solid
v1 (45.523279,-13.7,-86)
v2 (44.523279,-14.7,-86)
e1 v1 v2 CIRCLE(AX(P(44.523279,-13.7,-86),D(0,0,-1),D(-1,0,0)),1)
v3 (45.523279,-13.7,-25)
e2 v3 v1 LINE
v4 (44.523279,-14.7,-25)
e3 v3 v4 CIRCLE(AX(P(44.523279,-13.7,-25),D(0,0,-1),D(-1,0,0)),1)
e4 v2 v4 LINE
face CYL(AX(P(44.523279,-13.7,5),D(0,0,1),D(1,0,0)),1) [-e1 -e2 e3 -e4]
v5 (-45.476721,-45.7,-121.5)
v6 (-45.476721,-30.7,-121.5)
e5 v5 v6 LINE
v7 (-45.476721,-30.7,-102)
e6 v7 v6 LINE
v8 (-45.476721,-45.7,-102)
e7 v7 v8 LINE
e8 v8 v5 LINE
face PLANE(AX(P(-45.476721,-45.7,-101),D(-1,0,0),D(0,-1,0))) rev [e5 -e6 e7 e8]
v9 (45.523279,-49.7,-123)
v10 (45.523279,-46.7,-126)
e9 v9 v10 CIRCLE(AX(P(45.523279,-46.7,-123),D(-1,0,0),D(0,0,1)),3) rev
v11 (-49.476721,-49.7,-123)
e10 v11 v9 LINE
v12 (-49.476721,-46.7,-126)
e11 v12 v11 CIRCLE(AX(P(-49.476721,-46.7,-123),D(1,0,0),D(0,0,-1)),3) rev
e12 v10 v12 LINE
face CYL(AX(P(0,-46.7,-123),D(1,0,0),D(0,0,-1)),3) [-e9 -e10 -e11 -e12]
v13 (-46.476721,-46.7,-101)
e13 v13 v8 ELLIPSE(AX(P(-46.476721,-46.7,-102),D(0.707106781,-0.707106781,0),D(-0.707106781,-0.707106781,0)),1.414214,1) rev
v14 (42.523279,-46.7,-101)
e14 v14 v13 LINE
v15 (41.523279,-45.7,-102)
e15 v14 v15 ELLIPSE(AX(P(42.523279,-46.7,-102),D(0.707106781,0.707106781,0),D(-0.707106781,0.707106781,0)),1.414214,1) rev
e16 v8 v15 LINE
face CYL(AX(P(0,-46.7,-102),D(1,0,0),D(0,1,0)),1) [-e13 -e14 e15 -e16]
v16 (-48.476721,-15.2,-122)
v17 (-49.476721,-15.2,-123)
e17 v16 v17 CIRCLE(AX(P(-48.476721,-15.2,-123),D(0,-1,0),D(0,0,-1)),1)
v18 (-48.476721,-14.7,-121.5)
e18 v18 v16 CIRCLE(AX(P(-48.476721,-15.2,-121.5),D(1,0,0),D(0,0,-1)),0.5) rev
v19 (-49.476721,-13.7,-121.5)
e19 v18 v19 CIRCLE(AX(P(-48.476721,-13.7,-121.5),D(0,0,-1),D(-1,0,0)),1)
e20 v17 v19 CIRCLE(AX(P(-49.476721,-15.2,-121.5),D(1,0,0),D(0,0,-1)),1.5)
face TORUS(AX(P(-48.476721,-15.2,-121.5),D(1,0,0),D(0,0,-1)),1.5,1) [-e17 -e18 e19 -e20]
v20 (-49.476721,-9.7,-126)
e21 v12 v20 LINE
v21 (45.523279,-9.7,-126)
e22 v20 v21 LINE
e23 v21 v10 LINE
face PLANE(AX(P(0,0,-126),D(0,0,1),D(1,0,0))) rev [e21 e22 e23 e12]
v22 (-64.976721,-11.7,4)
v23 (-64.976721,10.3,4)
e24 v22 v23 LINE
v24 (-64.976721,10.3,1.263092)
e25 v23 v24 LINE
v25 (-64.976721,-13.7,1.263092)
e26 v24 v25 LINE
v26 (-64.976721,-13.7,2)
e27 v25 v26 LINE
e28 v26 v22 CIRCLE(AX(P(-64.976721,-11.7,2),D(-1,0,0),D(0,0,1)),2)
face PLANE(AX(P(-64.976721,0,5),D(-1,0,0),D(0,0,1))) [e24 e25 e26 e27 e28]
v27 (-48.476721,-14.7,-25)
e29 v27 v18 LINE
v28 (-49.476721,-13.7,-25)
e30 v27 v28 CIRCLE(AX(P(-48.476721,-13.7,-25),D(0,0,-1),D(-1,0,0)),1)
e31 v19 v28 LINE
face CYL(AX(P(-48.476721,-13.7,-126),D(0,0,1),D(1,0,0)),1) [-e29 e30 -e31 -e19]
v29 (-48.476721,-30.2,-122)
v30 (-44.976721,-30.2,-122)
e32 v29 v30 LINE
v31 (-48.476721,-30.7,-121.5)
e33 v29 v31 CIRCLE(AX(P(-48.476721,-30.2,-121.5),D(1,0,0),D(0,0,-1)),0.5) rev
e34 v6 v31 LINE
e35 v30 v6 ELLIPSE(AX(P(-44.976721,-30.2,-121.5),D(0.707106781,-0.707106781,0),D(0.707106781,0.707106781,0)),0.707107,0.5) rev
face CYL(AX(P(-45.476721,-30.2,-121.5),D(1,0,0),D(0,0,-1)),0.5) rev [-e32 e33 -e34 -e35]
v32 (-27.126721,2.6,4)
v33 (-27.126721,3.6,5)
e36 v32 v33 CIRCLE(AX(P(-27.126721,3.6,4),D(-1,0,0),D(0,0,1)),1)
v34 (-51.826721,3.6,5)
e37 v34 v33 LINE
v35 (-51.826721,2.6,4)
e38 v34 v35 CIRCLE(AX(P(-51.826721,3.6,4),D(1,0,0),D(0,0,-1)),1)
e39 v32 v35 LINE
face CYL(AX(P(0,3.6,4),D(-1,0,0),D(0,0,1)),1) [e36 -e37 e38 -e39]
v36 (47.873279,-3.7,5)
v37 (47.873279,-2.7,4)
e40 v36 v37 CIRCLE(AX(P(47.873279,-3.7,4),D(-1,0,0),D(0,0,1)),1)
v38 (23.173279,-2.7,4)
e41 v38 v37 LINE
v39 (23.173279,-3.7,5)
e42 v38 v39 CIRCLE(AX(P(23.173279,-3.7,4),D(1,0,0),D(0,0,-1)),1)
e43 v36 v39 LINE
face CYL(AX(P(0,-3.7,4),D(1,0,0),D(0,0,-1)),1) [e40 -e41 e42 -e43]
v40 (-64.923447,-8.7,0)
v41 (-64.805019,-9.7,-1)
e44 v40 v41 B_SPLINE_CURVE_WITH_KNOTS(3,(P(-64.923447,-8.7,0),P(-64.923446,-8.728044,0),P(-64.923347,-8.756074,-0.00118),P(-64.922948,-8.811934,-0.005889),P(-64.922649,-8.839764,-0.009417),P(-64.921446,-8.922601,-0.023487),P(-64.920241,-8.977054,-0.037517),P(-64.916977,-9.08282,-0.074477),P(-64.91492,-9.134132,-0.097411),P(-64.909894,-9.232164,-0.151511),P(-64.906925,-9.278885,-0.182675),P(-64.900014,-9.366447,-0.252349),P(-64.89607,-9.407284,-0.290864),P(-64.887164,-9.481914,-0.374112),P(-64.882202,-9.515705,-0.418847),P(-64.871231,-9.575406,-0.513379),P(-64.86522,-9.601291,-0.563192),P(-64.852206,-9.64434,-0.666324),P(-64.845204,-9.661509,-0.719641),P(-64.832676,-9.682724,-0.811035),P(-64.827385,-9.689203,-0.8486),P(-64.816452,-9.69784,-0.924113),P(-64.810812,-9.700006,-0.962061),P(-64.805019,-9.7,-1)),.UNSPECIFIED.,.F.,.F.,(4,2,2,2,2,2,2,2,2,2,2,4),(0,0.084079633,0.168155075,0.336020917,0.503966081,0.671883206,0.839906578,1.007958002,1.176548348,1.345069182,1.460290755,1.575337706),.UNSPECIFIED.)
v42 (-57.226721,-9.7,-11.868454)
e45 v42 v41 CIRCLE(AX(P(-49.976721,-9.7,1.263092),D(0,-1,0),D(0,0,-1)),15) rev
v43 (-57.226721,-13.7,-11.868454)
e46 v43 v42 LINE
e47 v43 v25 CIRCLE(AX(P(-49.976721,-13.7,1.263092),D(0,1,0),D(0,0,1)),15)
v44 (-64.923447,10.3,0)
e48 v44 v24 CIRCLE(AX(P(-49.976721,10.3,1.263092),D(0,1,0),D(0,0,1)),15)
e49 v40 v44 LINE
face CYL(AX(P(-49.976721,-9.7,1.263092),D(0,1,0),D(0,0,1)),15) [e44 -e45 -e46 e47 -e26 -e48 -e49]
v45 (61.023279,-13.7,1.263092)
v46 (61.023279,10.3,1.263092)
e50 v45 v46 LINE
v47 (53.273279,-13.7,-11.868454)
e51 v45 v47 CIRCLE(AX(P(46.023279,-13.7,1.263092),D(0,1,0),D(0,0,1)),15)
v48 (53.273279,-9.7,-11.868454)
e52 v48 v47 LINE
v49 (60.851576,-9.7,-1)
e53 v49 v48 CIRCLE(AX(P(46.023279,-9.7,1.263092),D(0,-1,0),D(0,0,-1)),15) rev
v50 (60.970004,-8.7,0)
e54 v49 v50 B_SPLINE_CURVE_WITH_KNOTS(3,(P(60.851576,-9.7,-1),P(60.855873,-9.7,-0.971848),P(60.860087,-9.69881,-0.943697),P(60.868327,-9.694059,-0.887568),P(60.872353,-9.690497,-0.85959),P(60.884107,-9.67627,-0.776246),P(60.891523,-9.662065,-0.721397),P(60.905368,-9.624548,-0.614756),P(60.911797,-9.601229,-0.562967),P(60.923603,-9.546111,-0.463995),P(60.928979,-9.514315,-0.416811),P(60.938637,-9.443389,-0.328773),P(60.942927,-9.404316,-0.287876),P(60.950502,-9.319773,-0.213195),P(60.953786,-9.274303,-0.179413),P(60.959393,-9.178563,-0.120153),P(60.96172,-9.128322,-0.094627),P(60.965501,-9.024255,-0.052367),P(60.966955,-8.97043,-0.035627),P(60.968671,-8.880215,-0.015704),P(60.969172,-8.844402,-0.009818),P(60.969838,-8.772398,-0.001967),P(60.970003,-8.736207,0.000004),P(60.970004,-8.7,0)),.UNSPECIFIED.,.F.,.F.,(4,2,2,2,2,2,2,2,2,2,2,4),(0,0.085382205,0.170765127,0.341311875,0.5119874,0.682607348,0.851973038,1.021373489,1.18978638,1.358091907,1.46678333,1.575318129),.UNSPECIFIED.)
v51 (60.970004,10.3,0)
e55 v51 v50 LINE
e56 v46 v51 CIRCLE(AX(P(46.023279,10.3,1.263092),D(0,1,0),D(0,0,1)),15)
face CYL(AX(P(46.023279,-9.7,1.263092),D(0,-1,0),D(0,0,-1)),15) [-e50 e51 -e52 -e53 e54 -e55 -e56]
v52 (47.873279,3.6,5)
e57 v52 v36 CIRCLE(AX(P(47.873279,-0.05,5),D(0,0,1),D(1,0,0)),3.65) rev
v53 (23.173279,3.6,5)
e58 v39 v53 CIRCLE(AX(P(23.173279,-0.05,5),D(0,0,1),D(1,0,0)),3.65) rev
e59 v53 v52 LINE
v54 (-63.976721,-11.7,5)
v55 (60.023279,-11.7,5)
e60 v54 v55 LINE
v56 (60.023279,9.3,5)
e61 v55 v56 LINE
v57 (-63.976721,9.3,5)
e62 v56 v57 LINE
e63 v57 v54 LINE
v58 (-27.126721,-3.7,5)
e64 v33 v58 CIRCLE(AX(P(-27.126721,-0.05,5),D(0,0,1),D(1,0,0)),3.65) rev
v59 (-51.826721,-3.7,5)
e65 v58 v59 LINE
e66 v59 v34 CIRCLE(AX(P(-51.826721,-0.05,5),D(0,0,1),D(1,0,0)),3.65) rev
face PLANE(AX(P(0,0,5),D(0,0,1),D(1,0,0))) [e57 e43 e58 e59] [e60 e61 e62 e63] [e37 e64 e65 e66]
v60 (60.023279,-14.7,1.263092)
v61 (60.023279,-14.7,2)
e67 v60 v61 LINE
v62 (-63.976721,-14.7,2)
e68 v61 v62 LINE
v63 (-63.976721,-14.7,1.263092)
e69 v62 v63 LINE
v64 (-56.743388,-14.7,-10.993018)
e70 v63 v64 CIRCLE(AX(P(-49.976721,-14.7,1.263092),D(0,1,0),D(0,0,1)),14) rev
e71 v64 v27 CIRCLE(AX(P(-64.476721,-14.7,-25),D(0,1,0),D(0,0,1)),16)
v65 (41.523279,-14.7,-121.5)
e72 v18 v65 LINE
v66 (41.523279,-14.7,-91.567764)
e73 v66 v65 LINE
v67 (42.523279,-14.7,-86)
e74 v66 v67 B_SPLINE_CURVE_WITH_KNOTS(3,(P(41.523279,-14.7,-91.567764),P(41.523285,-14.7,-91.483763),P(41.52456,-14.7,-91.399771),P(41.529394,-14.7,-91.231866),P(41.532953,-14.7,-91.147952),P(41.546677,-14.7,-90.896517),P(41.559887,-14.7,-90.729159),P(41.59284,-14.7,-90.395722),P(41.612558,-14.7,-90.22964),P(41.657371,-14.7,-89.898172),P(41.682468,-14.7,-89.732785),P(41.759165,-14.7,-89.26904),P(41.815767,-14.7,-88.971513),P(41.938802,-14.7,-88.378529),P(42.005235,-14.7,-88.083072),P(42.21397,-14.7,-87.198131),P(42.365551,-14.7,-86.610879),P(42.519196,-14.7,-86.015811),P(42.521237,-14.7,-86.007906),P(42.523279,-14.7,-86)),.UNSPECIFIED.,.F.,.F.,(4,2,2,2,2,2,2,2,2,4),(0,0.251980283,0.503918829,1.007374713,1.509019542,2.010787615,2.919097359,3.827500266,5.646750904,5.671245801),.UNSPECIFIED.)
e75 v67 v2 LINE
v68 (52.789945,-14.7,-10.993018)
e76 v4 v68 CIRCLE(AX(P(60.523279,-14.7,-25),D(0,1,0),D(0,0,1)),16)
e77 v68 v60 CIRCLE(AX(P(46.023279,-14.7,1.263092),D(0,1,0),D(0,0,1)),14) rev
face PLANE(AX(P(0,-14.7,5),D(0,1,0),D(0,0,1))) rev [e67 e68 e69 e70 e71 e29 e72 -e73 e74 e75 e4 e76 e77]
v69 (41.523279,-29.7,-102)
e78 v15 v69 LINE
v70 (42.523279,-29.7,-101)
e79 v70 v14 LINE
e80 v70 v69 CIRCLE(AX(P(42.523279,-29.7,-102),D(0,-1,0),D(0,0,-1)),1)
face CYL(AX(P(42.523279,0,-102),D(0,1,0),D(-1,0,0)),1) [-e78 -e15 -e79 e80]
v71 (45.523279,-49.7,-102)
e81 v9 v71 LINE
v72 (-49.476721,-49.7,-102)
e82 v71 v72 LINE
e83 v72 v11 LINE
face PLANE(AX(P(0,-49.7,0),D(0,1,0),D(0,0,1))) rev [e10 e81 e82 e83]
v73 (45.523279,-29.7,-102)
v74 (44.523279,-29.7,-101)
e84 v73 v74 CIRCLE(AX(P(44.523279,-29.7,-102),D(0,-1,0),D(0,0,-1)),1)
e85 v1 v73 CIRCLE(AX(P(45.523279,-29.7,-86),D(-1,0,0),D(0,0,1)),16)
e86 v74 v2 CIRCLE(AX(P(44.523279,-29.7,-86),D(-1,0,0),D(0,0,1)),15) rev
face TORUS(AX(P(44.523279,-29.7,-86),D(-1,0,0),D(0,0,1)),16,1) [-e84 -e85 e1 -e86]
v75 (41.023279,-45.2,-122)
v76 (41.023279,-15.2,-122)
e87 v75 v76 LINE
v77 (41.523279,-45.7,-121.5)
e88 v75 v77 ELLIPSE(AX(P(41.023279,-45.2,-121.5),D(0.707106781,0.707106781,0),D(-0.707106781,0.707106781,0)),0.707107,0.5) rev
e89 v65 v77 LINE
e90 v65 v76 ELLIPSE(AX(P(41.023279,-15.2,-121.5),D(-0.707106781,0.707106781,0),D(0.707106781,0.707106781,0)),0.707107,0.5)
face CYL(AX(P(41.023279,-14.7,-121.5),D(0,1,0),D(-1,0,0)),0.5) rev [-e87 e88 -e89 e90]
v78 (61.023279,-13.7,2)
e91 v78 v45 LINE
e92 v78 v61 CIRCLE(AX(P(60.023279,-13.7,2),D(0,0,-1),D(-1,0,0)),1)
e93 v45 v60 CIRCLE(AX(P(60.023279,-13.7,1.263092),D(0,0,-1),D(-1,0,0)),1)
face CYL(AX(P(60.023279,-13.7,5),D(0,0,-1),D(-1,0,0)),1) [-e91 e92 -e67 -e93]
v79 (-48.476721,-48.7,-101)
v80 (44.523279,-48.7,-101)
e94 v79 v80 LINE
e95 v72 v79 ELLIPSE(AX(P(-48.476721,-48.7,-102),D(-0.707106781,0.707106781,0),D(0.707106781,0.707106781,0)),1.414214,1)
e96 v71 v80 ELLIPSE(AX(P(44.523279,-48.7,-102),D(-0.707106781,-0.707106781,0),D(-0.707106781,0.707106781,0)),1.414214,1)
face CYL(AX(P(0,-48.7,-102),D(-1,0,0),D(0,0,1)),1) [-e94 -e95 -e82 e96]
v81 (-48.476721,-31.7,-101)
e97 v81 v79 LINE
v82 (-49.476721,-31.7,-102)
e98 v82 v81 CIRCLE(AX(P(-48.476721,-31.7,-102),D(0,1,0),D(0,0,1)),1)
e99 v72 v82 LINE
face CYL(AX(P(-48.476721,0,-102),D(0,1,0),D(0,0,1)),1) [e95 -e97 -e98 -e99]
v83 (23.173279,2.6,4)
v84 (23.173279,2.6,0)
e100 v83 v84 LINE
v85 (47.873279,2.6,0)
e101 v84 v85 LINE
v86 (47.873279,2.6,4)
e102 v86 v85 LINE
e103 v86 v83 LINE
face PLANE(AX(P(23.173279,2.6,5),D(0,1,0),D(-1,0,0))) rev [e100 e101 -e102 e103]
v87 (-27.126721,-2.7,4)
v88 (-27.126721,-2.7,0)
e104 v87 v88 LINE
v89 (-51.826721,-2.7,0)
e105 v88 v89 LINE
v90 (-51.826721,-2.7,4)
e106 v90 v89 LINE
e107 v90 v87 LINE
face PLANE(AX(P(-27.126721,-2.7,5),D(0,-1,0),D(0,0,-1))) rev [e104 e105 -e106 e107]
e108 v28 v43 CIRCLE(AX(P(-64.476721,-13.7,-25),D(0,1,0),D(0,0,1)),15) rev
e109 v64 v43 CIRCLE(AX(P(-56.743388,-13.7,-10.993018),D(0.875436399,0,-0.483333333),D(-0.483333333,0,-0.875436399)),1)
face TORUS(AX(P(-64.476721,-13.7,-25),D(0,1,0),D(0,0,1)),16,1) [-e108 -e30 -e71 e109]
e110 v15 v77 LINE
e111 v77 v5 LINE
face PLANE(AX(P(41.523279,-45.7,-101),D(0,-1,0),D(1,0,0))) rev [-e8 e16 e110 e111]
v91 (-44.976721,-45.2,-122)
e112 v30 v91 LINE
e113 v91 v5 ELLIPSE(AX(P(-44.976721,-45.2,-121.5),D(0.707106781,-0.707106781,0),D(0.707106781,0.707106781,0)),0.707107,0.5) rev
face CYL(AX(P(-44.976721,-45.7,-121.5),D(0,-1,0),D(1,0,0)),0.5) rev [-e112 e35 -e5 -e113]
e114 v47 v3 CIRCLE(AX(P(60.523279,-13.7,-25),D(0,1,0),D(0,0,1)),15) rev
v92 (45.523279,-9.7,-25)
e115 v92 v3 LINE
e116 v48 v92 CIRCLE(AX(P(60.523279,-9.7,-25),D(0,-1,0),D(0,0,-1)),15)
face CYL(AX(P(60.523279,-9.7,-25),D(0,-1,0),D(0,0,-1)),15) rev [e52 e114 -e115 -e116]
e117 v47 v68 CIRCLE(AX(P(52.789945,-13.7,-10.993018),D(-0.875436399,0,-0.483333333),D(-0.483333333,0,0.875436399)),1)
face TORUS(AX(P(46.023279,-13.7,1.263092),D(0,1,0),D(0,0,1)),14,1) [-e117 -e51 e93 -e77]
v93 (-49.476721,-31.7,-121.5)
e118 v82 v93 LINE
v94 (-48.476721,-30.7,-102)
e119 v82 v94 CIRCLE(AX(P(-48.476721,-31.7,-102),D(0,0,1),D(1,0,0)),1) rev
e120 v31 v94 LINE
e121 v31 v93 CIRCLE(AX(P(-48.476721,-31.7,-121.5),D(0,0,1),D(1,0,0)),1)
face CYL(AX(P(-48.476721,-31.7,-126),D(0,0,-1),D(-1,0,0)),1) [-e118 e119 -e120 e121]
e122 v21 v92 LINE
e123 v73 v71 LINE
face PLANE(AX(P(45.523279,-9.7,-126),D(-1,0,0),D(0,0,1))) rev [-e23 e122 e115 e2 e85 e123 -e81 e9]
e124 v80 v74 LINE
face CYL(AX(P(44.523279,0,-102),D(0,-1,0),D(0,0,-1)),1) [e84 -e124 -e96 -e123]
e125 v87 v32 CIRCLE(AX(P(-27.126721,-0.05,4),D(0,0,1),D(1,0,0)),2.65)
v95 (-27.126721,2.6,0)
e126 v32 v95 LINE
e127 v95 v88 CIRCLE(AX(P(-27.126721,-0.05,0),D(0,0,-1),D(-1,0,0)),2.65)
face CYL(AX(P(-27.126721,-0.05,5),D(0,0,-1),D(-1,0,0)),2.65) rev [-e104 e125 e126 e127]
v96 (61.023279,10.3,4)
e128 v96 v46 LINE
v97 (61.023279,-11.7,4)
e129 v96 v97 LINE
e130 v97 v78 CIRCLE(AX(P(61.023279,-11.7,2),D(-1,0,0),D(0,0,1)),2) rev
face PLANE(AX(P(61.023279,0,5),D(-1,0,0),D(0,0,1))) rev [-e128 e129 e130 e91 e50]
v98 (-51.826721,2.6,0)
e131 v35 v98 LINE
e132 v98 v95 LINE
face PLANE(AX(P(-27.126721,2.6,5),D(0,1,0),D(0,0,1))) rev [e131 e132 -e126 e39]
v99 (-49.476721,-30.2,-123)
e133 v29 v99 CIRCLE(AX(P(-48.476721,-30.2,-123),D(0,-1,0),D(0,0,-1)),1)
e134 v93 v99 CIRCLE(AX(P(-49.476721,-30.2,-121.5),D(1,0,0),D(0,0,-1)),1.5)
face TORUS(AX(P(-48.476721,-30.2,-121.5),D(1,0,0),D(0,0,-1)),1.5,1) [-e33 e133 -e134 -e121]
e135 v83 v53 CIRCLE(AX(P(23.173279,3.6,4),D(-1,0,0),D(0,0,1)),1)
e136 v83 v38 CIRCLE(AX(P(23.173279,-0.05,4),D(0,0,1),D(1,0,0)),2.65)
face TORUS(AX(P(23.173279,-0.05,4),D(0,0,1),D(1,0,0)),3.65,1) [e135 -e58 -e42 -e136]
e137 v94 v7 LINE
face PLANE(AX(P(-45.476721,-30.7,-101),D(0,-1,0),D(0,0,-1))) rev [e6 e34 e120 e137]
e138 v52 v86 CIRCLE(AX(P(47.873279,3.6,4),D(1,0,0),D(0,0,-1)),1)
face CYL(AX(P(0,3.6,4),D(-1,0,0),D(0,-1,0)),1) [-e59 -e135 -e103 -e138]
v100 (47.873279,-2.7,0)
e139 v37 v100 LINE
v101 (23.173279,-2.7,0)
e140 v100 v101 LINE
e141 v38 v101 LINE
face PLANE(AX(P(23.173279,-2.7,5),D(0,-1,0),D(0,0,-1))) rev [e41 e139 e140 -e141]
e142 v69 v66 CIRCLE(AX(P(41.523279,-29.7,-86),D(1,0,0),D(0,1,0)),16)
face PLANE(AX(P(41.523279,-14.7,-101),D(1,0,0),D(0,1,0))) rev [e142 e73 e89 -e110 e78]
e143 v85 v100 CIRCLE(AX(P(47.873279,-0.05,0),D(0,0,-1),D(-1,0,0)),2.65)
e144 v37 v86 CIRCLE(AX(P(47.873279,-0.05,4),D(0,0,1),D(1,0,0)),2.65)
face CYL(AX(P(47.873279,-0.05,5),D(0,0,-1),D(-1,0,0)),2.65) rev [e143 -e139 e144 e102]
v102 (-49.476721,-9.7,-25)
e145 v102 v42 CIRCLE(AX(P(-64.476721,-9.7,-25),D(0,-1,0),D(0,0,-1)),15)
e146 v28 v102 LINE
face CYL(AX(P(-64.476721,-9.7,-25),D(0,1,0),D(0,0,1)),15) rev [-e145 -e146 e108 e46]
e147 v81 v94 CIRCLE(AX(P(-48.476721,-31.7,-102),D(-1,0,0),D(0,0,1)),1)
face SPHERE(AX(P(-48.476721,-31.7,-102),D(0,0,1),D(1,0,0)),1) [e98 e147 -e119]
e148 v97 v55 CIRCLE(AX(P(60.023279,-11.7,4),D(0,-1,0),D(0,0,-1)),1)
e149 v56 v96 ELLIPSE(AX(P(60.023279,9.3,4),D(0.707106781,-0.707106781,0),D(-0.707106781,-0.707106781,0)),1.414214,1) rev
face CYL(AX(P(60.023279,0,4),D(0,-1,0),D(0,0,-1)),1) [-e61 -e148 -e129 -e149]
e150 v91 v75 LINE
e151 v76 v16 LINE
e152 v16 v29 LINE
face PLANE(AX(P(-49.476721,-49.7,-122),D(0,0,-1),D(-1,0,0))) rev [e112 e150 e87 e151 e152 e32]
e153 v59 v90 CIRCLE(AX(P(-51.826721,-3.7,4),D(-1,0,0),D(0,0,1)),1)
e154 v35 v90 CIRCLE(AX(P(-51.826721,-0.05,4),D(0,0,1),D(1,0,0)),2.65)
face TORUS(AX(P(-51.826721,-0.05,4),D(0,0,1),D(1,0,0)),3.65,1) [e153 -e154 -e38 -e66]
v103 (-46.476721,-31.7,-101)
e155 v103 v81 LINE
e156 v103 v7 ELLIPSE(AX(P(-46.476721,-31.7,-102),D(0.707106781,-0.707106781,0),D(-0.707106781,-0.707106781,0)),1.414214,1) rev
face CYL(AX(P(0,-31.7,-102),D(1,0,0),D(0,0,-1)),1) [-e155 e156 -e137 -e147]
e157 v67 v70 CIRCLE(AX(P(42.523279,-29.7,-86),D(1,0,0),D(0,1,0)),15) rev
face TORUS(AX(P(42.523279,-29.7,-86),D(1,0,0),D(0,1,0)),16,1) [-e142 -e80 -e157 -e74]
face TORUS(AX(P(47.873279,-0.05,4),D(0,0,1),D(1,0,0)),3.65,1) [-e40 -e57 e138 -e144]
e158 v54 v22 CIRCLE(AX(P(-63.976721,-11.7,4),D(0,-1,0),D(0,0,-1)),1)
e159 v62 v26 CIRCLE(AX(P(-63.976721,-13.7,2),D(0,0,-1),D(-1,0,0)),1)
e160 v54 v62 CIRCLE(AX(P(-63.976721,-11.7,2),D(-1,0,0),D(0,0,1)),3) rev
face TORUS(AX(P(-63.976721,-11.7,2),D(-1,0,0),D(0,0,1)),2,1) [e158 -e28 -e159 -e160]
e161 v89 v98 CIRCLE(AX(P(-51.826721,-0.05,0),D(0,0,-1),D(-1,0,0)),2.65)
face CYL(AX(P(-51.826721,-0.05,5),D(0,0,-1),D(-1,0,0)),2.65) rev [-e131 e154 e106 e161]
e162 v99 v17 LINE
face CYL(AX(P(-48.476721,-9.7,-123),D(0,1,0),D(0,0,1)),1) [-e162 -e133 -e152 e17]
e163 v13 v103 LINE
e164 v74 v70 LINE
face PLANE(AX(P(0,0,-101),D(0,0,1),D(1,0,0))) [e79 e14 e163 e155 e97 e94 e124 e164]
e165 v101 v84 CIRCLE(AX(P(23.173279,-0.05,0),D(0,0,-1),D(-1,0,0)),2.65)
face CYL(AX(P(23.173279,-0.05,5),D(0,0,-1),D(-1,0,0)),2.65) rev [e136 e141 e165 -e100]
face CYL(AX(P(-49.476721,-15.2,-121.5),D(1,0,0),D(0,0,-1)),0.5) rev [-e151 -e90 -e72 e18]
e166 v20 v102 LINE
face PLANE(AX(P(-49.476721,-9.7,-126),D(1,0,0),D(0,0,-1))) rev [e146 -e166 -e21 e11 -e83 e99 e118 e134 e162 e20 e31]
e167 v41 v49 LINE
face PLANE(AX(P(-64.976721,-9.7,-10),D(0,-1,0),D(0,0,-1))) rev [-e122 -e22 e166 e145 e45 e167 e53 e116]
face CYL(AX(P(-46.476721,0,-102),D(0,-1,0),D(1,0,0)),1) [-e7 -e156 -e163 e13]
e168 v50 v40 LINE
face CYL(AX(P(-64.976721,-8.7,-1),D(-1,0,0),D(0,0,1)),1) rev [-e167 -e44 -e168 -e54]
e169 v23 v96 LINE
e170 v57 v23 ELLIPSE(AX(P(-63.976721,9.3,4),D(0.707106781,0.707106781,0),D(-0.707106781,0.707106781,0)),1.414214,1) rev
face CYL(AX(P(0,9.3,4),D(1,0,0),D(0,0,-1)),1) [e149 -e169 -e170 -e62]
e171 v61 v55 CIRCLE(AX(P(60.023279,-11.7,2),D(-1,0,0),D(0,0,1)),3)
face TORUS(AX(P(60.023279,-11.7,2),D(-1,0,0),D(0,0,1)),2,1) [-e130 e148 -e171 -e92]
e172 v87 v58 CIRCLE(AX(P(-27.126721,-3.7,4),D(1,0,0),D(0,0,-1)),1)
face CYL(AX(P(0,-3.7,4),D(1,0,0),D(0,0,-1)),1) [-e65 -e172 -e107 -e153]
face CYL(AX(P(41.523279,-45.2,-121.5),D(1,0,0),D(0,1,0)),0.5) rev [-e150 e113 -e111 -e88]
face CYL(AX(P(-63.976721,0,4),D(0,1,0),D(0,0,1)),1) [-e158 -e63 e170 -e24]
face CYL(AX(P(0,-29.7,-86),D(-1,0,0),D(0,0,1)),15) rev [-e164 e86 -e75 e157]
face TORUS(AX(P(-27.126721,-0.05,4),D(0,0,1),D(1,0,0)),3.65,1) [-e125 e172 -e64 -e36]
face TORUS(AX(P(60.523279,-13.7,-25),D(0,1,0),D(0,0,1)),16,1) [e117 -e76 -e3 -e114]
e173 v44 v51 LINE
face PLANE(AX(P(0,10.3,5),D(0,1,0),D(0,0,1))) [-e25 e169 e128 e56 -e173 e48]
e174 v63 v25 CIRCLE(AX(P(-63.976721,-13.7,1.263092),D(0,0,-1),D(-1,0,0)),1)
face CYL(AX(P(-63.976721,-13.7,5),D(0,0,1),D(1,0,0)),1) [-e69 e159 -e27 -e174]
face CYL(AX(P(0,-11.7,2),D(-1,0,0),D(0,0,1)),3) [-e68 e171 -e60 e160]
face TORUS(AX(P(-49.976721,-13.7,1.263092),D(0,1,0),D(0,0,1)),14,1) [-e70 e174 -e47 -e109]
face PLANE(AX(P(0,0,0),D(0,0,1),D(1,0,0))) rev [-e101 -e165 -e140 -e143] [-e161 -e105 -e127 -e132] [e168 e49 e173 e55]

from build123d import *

# Parameters (mm, degrees)
SKETCH2_W           = 126
SKETCH2_H           = 20
SKETCH2_H_2         = 4.999999999999998
BOSS_EXTRUDE1_DEPTH = 5
CUT_EXTRUDE1_DEPTH  = 5
SKETCH4_W           = 126
SKETCH4_H           = 4.999999999999998
BOSS_EXTRUDE3_DEPTH = 10
SKETCH5_W           = 95
SKETCH5_H           = 4.999999999999998
BOSS_EXTRUDE4_DEPTH = 116
SKETCH6_W           = 95
SKETCH6_H           = 4
BOSS_EXTRUDE5_DEPTH = 35
BOSS_EXTRUDE6_DEPTH = 21
FILLET2_R           = 15
FILLET3_R           = 15
FILLET4_R           = 3
FILLET5_R           = 15
FILLET6_R           = 0.5
FILLET7_R           = 3
FILLET8_R           = 1
FILLET9_R           = 1


with BuildPart() as part:
    # Sketch2 → Boss-Extrude1 (new body)
    with BuildSketch(Plane.XY):
        with Locations((-1.976721396074229, 0.2999999999999954)):
            Rectangle(SKETCH2_W, SKETCH2_H)
        with Locations((-1.976721396074229, -12.200000000000003)):
            Rectangle(SKETCH2_W, SKETCH2_H_2)
    extrude(amount=BOSS_EXTRUDE1_DEPTH)

    # Sketch3 → Cut-Extrude1 (cut)
    with BuildSketch(Plane(origin=(0, 0, 0), x_dir=(-1, 0, 0), z_dir=(0, 0, -1))):
        with BuildLine():
            Line((27.126721396074235, 2.6), (51.82672139607423, 2.6))
            ThreePointArc((51.82672139607423, 2.6), (54.476721396074225, -0.04999999999999918), (51.82672139607423, -2.6999999999999984))
            Line((51.82672139607423, -2.6999999999999984), (27.126721396074235, -2.6999999999999984))
            ThreePointArc((27.126721396074235, -2.6999999999999984), (24.476721396074236, -0.04999999999999894), (27.126721396074235, 2.6))
        make_face()
        with BuildLine():
            Line((-23.173278603925766, -2.7000000000000055), (-47.87327860392578, -2.7000000000000055))
            ThreePointArc((-47.87327860392578, -2.7000000000000055), (-50.52327860392578, -0.05000000000000848), (-47.87327860392578, 2.5999999999999885))
            Line((-47.87327860392578, 2.5999999999999885), (-23.173278603925766, 2.5999999999999948))
            ThreePointArc((-23.173278603925766, 2.5999999999999948), (-20.523278603925768, -0.05000000000000534), (-23.173278603925766, -2.7000000000000055))
        make_face()
    extrude(amount=-CUT_EXTRUDE1_DEPTH, mode=Mode.SUBTRACT)

    # Sketch4 → Boss-Extrude3 (add)
    with BuildSketch(Plane(origin=(0, 0, 0), x_dir=(-1, 0, 0), z_dir=(0, 0, -1))):
        with Locations((1.976721396074229, -12.200000000000003)):
            Rectangle(SKETCH4_W, SKETCH4_H)
    extrude(amount=BOSS_EXTRUDE3_DEPTH)

    # Sketch5 → Boss-Extrude4 (add)
    with BuildSketch(Plane(origin=(0, 0, -10), x_dir=(-1, 0, 0), z_dir=(0, 0, -1))):
        with Locations((1.9767213960742254, -12.200000000000003)):
            Rectangle(SKETCH5_W, SKETCH5_H)
    extrude(amount=BOSS_EXTRUDE4_DEPTH)

    # Sketch6 → Boss-Extrude5 (add)
    with BuildSketch(Plane.XZ.offset(14.700000000000005)):
        with Locations((-1.9767213960742254, -124.00000000000001)):
            Rectangle(SKETCH6_W, SKETCH6_H)
    extrude(amount=BOSS_EXTRUDE5_DEPTH)

    # Sketch7 → Boss-Extrude6 (add)
    with BuildSketch(Plane.XY.offset(-122)):
        Polygon((-49.476721396074225, -30.70000000000001), (-49.476721396074225, -49.70000000000001), (45.523278603925775, -49.70000000000001), (45.523278603925775, -14.700000000000005), (41.52327860392578, -14.700000000000005), (41.52327860392579, -45.7), (-45.47672139607422, -45.70000000000002), (-45.476721396074225, -30.70000000000001), align=None)
    extrude(amount=BOSS_EXTRUDE6_DEPTH)

    # Fillet2
    fillet2_edges = [part.edges().sort_by_distance(p)[0] for p in [
        (45.523278603925775, -12.200000000000005, -10),
        (-49.476721396074225, -12.200000000000005, -10),
    ]]
    fillet(fillet2_edges, radius=FILLET2_R)

    # Fillet3
    # the kernel refuses this fillet: 15 mm, written as the material it takes off along each edge
    with BuildSketch(Plane(origin=(61.02327860392577, -42.857729933344494, -10), x_dir=(-0.9721461368215704, 0, -0.23437552914691517), z_dir=(0, 1, 0))) as fillet3_piece_1:
        with BuildLine():
            CenterArc((11.942398911242131, 14.4650042877501), FILLET3_R, 193.55481522372781, 61.096665460152735)
            Line((-2.6397931410814257, 10.949371350546373), (-4.098012346313782, 10.597808056826002))
            Line((-4.098012346313782, 10.597808056826002), (-1.4582192052323555, -0.35156329372037276))
            Line((-1.4582192052323555, -0.35156329372037276), (0.35156329372037276, -1.4582192052323555))
            ThreePointArc((0.35156329372037276, -1.4582192052323555), (0.8376363621311502, -1.3410314406588961), (7.575017813146935, -1.4465004287750098))
            Line((7.575017813146935, -1.4465004287750098), (7.972052458428318, 6e-17))
        make_face()
    extrude(amount=61.31545986668898, mode=Mode.SUBTRACT)
    with BuildSketch(Plane(origin=(-64.97672139607423, 18.45772993334451, -10), x_dir=(0.9721461368215705, 0, -0.23437552914691476), z_dir=(0, -1, 0))) as fillet3_piece_2:
        with BuildLine():
            CenterArc((11.942398911242128, 14.4650042877501), FILLET3_R, 193.55481522372781, 61.096665460152735)
            Line((-2.63979314108143, 10.949371350546382), (-4.098012346313785, 10.59780805682601))
            Line((-4.098012346313785, 10.59780805682601), (-1.4582192052323557, -0.35156329372037215))
            Line((-1.4582192052323557, -0.35156329372037215), (0.35156329372037215, -1.4582192052323557))
            ThreePointArc((0.35156329372037215, -1.4582192052323557), (0.8376363621311566, -1.3410314406588948), (7.575017813146934, -1.4465004287750098))
            Line((7.575017813146934, -1.4465004287750098), (7.972052458428317, -3e-17))
        make_face()
    extrude(amount=61.315459866689025, mode=Mode.SUBTRACT)

    # Fillet4
    fillet4_edges = [part.edges().sort_by_distance(p)[0] for p in [
        (-1.9767213960742254, -49.7, -126),
    ]]
    fillet(fillet4_edges, radius=FILLET4_R)

    # Fillet5
    fillet5_edges = [part.edges().sort_by_distance(p)[0] for p in [
        (43.523278603925775, -14.700000000000005, -101),
    ]]
    fillet(fillet5_edges, radius=FILLET5_R)

    # Fillet6
    fillet6_edges = [part.edges().sort_by_distance(p)[0] for p in [
        (-3.9767213960742183, -14.700000000000005, -122),
        (-47.476721396074225, -30.70000000000001, -122),
        (41.52327860392579, -30.200000000000003, -122),
        (-1.9767213960742112, -45.70000000000001, -122),
        (-45.476721396074225, -38.20000000000002, -122),
    ]]
    fillet(fillet6_edges, radius=FILLET6_R)

    # Fillet7
    fillet7_edges = [part.edges().sort_by_distance(p)[0] for p in [
        (-1.9767213960742325, -14.700000000000005, 5),
    ]]
    fillet(fillet7_edges, radius=FILLET7_R)

    # Fillet8
    fillet8_edges = [part.edges().sort_by_distance(p)[0] for p in [
        (-1.976721396074005, -9.700000000000005, 0),
    ]]
    fillet(fillet8_edges, radius=FILLET8_R)

    # Fillet9
    # the kernel refuses this fillet: 1 mm, written as the material it takes off along each edge
    with BuildSketch(Plane(origin=(-48.476721396074225, -31.70000000000001, -102), x_dir=(0, 0, 1), z_dir=(0, 1, 0))) as fillet9_piece_1_section:
        Polygon((0, 0), (FILLET9_R * 1.02, 0), (FILLET9_R * 1.02, -FILLET9_R * 1.02), (0, -FILLET9_R * 1.02), align=None)
    fillet9_piece_1 = extrude(amount=FILLET9_R * 1.02, mode=Mode.PRIVATE)
    fillet9_piece_1 = fillet9_piece_1 - Plane(origin=(-48.476721396074225, -31.70000000000001, -102), x_dir=(0.7071067811865475, 0, -0.7071067811865475), z_dir=(0, 1, 0)) * Sphere(FILLET9_R, mode=Mode.PRIVATE)
    add(fillet9_piece_1, mode=Mode.SUBTRACT)
    with BuildSketch(Plane(origin=(60.523278603925775, -14.700000000000005, -24.999999999999996), x_dir=(-1, 0, 0), z_dir=(0, 0, -1))) as fillet9_piece_2:
        with BuildLine():
            CenterArc((15 + FILLET9_R, FILLET9_R), FILLET9_R, 180, 90)
            Line((15, FILLET9_R), (15, 0))
            Line((15, 0), (15 + FILLET9_R, 0))
        make_face()
    revolve(axis=Axis((60.523278603925775, -14.700000000000005, -24.999999999999996), (0, 1, 0)), revolution_arc=61.09666546015381, mode=Mode.SUBTRACT)
    with BuildSketch(Plane(origin=(-64.47672139607423, -14.700000000000005, -24.999999999999996), x_dir=(0.483333333333338, 0, 0.8754363991112571), z_dir=(-0.8754363991112571, 0, 0.483333333333338))) as fillet9_piece_3:
        with BuildLine():
            CenterArc((15.000000000000005 + FILLET9_R, FILLET9_R), FILLET9_R, 180, 90.00000000000023)
            Line((15.000000000000005 + FILLET9_R, 0), (15.000000000000005, 0))
            Line((15.000000000000005, 0), (15.000000000000005, FILLET9_R))
        make_face()
    revolve(axis=Axis((-64.47672139607423, -14.700000000000005, -24.999999999999996), (0, 1, 0)), revolution_arc=61.09666546015241, mode=Mode.SUBTRACT)
    with BuildSketch(Plane(origin=(-49.97672139607436, -14.700000000000003, 1.2630919733380015), x_dir=(-0.48333333333331013, 0, -0.8754363991112726), z_dir=(0.8754363991112726, 0, -0.48333333333331013))) as fillet9_piece_4:
        with BuildLine():
            CenterArc((15 - FILLET9_R, FILLET9_R), FILLET9_R, 269.9999999999998, 90.00000000000023)
            Line((15 - FILLET9_R, 0), (15, 0))
            Line((15, 0), (15, FILLET9_R))
        make_face()
    revolve(axis=Axis((-49.97672139607436, -14.700000000000003, 1.2630919733380015), (0, 1, 0)), revolution_arc=61.096665460153005, mode=Mode.SUBTRACT)
    with BuildSketch(Plane(origin=(46.023278603926364, -14.700000000000003, 1.2630919733380015), x_dir=(0.48333333333331013, 0, -0.8754363991112726), z_dir=(-0.8754363991112726, 0, -0.48333333333331013))) as fillet9_piece_5:
        with BuildLine():
            CenterArc((15 - FILLET9_R, -FILLET9_R), FILLET9_R, 359.9999999999999, 90.00000000000011)
            Line((15, -FILLET9_R), (15, 0))
            Line((15, 0), (15 - FILLET9_R, 1.78e-15))
        make_face()
    revolve(axis=Axis((46.023278603926364, -14.700000000000003, 1.2630919733380015), (0, -1, 0)), revolution_arc=61.096665460153005, mode=Mode.SUBTRACT)
    with BuildSketch(Plane(origin=(41.52327860392578, -29.700000000000003, -101), x_dir=(0, 0, -1), z_dir=(2.3e-16, -1, 0))) as fillet9_piece_6:
        with BuildLine():
            CenterArc((FILLET9_R, FILLET9_R), FILLET9_R, 180, 90)
            Line((0, FILLET9_R), (0, 0))
            Line((0, 0), (FILLET9_R, 0))
        make_face()
    extrude(amount=16, mode=Mode.SUBTRACT)
    with BuildSketch(Plane(origin=(45.523278603925775, -14.700000000000005, -24.999999999999996), x_dir=(-1, 0, 0), z_dir=(0, 0, -1))) as fillet9_piece_7:
        with BuildLine():
            CenterArc((FILLET9_R, FILLET9_R), FILLET9_R, 180, 90)
            Line((0, FILLET9_R), (0, 0))
            Line((0, 0), (FILLET9_R, 0))
        make_face()
    extrude(amount=61, mode=Mode.SUBTRACT)
    with BuildSketch(Plane(origin=(41.52327860392579, -29.7, -86), x_dir=(0, 0, -1), z_dir=(0, -1, 0))) as fillet9_piece_8_section:
        with BuildLine():
            CenterArc((15 + FILLET9_R, FILLET9_R), FILLET9_R, 179.9999999999996, 90.0000000000004)
            Line((15, FILLET9_R), (15, 0))
            Line((15, 0), (15 + FILLET9_R, -7.11e-15))
        make_face()
    fillet9_piece_8 = revolve(axis=Axis((41.52327860392579, -29.7, -86), (1, 0, 0)), revolution_arc=118.65939784747897, mode=Mode.PRIVATE)
    fillet9_piece_8 = split(fillet9_piece_8, bisect_by=Plane(origin=(41.52327860392579, -14.700000000000005, -86), z_dir=(0, -1, 0)), keep=Keep.TOP, mode=Mode.PRIVATE)
    add(fillet9_piece_8, mode=Mode.SUBTRACT)
    with BuildSketch(Plane(origin=(45.523278603925775, -29.7, -86), x_dir=(0, 0, -1), z_dir=(0, -1, 0))) as fillet9_piece_9:
        with BuildLine():
            CenterArc((15 + FILLET9_R, -FILLET9_R), FILLET9_R, 90, 90)
            Line((15, -FILLET9_R), (15, 0))
            Line((15, 0), (15 + FILLET9_R, 0))
        make_face()
    revolve(axis=Axis((45.523278603925775, -29.7, -86), (1, 0, 0)), revolution_arc=90, mode=Mode.SUBTRACT)
    with BuildSketch(Plane(origin=(-49.476721396074225, -15.200000000000005, -122), x_dir=(0, 0, -1), z_dir=(0, -1, 0))) as fillet9_piece_10:
        with BuildLine():
            CenterArc((FILLET9_R, FILLET9_R), FILLET9_R, 180, 90)
            Line((0, FILLET9_R), (0, 0))
            Line((0, 0), (FILLET9_R, 0))
        make_face()
    extrude(amount=15.000000000000005, mode=Mode.SUBTRACT)
    with BuildSketch(Plane(origin=(-49.476721396074225, -14.700000000000005, -25), x_dir=(1, 0, 0), z_dir=(0, 0, -1))) as fillet9_piece_11:
        with BuildLine():
            CenterArc((FILLET9_R, -FILLET9_R), FILLET9_R, 90, 90)
            Line((-7.11e-15, -FILLET9_R), (0, 0))
            Line((0, 0), (FILLET9_R, 0))
        make_face()
    extrude(amount=96.5, mode=Mode.SUBTRACT)
    with BuildSketch(Plane(origin=(-49.476721396074225, -30.20000000000001, -121.5), x_dir=(0, 0, -1), z_dir=(0, 1, 0))) as fillet9_piece_12:
        with BuildLine():
            CenterArc((0.5 + FILLET9_R, -FILLET9_R), FILLET9_R, 90, 90)
            Line((0.5, -FILLET9_R), (0.5, 0))
            Line((0.5, 0), (0.5 + FILLET9_R, 0))
        make_face()
    revolve(axis=Axis((-49.476721396074225, -30.20000000000001, -121.5), (-1, 0, 0)), revolution_arc=90, mode=Mode.SUBTRACT)
    with BuildSketch(Plane(origin=(-49.47672139607422, -15.200000000000005, -121.5), x_dir=(0, 0, -1), z_dir=(0, -1, 0))) as fillet9_piece_13:
        with BuildLine():
            CenterArc((0.5 + FILLET9_R, FILLET9_R), FILLET9_R, 179.9999999999996, 90.0000000000004)
            Line((0.5, FILLET9_R), (0.5, 0))
            Line((0.5, 0), (0.5 + FILLET9_R, -7.11e-15))
        make_face()
    revolve(axis=Axis((-49.47672139607422, -15.200000000000005, -121.5), (1, 0, 0)), revolution_arc=90, mode=Mode.SUBTRACT)
    with BuildSketch(Plane(origin=(-64.97672139607423, 12.799999999999995, 5), x_dir=(0, 0, -1), z_dir=(0, -1, 0))) as fillet9_piece_14:
        with BuildLine():
            CenterArc((FILLET9_R, FILLET9_R), FILLET9_R, 180, 90)
            Line((0, FILLET9_R), (0, 0))
            Line((0, 0), (FILLET9_R, 0))
        make_face()
    extrude(amount=24.5, mode=Mode.SUBTRACT)
    with BuildSketch(Plane(origin=(61.02327860392577, 12.799999999999995, 5), x_dir=(-1, 0, 0), z_dir=(0, -1, 0))) as fillet9_piece_15:
        with BuildLine():
            CenterArc((FILLET9_R, FILLET9_R), FILLET9_R, 180, 90)
            Line((0, FILLET9_R), (0, 0))
            Line((0, 0), (FILLET9_R, 0))
        make_face()
    extrude(amount=24.5, mode=Mode.SUBTRACT)
    with BuildSketch(Plane(origin=(61.02327860392577, -14.700000000000005, 2.0000000000000004), x_dir=(-1, 0, 0), z_dir=(0, 0, -1))) as fillet9_piece_16:
        with BuildLine():
            CenterArc((FILLET9_R, FILLET9_R), FILLET9_R, 180, 90)
            Line((0, FILLET9_R), (0, 0))
            Line((0, 0), (FILLET9_R, 0))
        make_face()
    extrude(amount=0.7369080266624892, mode=Mode.SUBTRACT)
    with BuildSketch(Plane(origin=(61.02327860392577, -11.700000000000005, 2.0000000000000004), x_dir=(0, -1, 0), z_dir=(0, 0, -1))) as fillet9_piece_17:
        with BuildLine():
            CenterArc((3.0000000000000018 - FILLET9_R, FILLET9_R), FILLET9_R, 270, 90)
            Line((3.0000000000000018, FILLET9_R), (3.0000000000000018, 0))
            Line((3.0000000000000018, 0), (3.0000000000000018 - FILLET9_R, 0))
        make_face()
    revolve(axis=Axis((61.02327860392577, -11.700000000000005, 2.0000000000000004), (-1, 0, 0)), revolution_arc=90, mode=Mode.SUBTRACT)
    with BuildSketch(Plane(origin=(-64.97672139607423, -14.700000000000005, 2.0000000000000004), x_dir=(0, 1, 0), z_dir=(0, 0, -1))) as fillet9_piece_18:
        with BuildLine():
            CenterArc((FILLET9_R, FILLET9_R), FILLET9_R, 180.0000000000004, 89.9999999999996)
            Line((0, FILLET9_R), (0, 0))
            Line((0, 0), (FILLET9_R, 0))
        make_face()
    extrude(amount=0.7369080266624892, mode=Mode.SUBTRACT)
    with BuildSketch(Plane(origin=(-64.97672139607423, -11.700000000000005, 2.0000000000000004), x_dir=(0, -1, 0), z_dir=(0, 0, -1))) as fillet9_piece_19:
        with BuildLine():
            CenterArc((3.0000000000000018 - FILLET9_R, -FILLET9_R), FILLET9_R, 4.0711e-13, 89.9999999999996)
            Line((3.0000000000000018, -FILLET9_R), (3.0000000000000018, 0))
            Line((3.0000000000000018, 0), (3.0000000000000018 - FILLET9_R, 0))
        make_face()
    revolve(axis=Axis((-64.97672139607423, -11.700000000000005, 2.0000000000000004), (-1, 0, 0)), revolution_arc=90, mode=Mode.SUBTRACT)
    with BuildSketch(Plane(origin=(63.52327860392577, 10.299999999999995, 5), x_dir=(0, 0, -1), z_dir=(-1, 0, 0))) as fillet9_piece_20:
        with BuildLine():
            CenterArc((FILLET9_R, FILLET9_R), FILLET9_R, 180, 90)
            Line((0, FILLET9_R), (0, 0))
            Line((0, 0), (FILLET9_R, 0))
        make_face()
    extrude(amount=131, mode=Mode.SUBTRACT)
    with BuildSketch(Plane(origin=(-27.126721396074235, -0.04999999999999905, 5), x_dir=(0, -1, 0), z_dir=(-1, 0, 0))) as fillet9_piece_21:
        with BuildLine():
            CenterArc((2.6499999999999986 + FILLET9_R, -FILLET9_R), FILLET9_R, 90, 90)
            Line((2.6499999999999986 + FILLET9_R, 0), (2.6499999999999986, 0))
            Line((2.6499999999999986, 0), (2.6499999999999986, -FILLET9_R))
        make_face()
    revolve(axis=Axis((-27.126721396074235, -0.04999999999999905, 5), (0, 0, 1)), revolution_arc=180, mode=Mode.SUBTRACT)
    with BuildSketch(Plane(origin=(-27.126721396074235, 2.6, 5), x_dir=(0, 0, -1), z_dir=(-1, 0, 0)), Plane(origin=(-51.82672139607423, -2.6999999999999984, 5), x_dir=(0, 0, -1), z_dir=(1, 0, 0))) as fillet9_piece_22:
        with BuildLine():
            CenterArc((FILLET9_R, -FILLET9_R), FILLET9_R, 90, 90)
            Line((0, -FILLET9_R), (0, 0))
            Line((0, 0), (FILLET9_R, 0))
        make_face()
    extrude(amount=24.699999999999992, mode=Mode.SUBTRACT)
    with BuildSketch(Plane(origin=(-51.82672139607422, -0.04999999999999927, 5), x_dir=(-2.68e-15, 1, 0), z_dir=(1, 2.68e-15, 0))) as fillet9_piece_23:
        with BuildLine():
            CenterArc((2.6499999999999986 + FILLET9_R, -FILLET9_R), FILLET9_R, 90, 90)
            Line((2.6499999999999986 + FILLET9_R, 0), (2.6499999999999986, 0))
            Line((2.6499999999999986, 0), (2.6499999999999986, -FILLET9_R))
        make_face()
    revolve(axis=Axis((-51.82672139607422, -0.04999999999999927, 5), (0, 0, 1)), revolution_arc=179.9999999999997, mode=Mode.SUBTRACT)
    with BuildSketch(Plane(origin=(23.173278603925766, -0.0500000000000056, 5), x_dir=(0, 1, 0), z_dir=(1, 0, 0))) as fillet9_piece_24:
        with BuildLine():
            CenterArc((2.6499999999999986 + FILLET9_R, -FILLET9_R), FILLET9_R, 90, 90)
            Line((2.6499999999999986 + FILLET9_R, 0), (2.6499999999999986, 0))
            Line((2.6499999999999986, 0), (2.6499999999999986, -FILLET9_R))
        make_face()
    revolve(axis=Axis((23.173278603925766, -0.0500000000000056, 5), (0, 0, 1)), revolution_arc=180, mode=Mode.SUBTRACT)
    with BuildSketch(Plane(origin=(23.173278603925766, -2.7000000000000055, 5), x_dir=(0, 0, -1), z_dir=(1, 0, 0)), Plane(origin=(47.87327860392578, 2.5999999999999885, 5), x_dir=(0, 0, -1), z_dir=(-1, 2.5e-16, 0))) as fillet9_piece_25:
        with BuildLine():
            CenterArc((FILLET9_R, -FILLET9_R), FILLET9_R, 90, 90)
            Line((0, -FILLET9_R), (0, 0))
            Line((0, 0), (FILLET9_R, 0))
        make_face()
    extrude(amount=24.700000000000017, mode=Mode.SUBTRACT)
    with BuildSketch(Plane(origin=(47.87327860392579, -0.05000000000000837, 5), x_dir=(-2.68e-15, -1, 0), z_dir=(-1, 2.68e-15, 0))) as fillet9_piece_26:
        with BuildLine():
            CenterArc((2.6499999999999986 + FILLET9_R, -FILLET9_R), FILLET9_R, 90, 90)
            Line((2.6499999999999986 + FILLET9_R, 0), (2.6499999999999986, 0))
            Line((2.6499999999999986, 0), (2.6499999999999986, -FILLET9_R))
        make_face()
    revolve(axis=Axis((47.87327860392579, -0.05000000000000837, 5), (0, 0, 1)), revolution_arc=180.0000000000003, mode=Mode.SUBTRACT)
    with BuildSketch(Plane(origin=(-49.476721396074225, -30.70000000000001, -121.5), x_dir=(0, -1, 0), z_dir=(0, 0, 1))) as fillet9_piece_27:
        with BuildLine():
            CenterArc((FILLET9_R, FILLET9_R), FILLET9_R, 180, 90)
            Line((0, FILLET9_R), (0, 0))
            Line((0, 0), (FILLET9_R, 0))
        make_face()
    extrude(amount=19.5, mode=Mode.SUBTRACT)
    with BuildSketch(Plane(origin=(-42.976721396074225, -30.70000000000001, -101), x_dir=(0, -1, 0), z_dir=(-1, 0, 0))) as fillet9_piece_28:
        with BuildLine():
            CenterArc((FILLET9_R, -FILLET9_R), FILLET9_R, 90, 90)
            Line((0, -FILLET9_R), (0, 0))
            Line((0, 0), (FILLET9_R, 0))
        make_face()
    extrude(amount=5.5, mode=Mode.SUBTRACT)
    with BuildSketch(Plane(origin=(-49.476721396074225, -31.70000000000001, -101), x_dir=(0, 0, -1), z_dir=(0, -1, 0))) as fillet9_piece_29:
        with BuildLine():
            CenterArc((FILLET9_R, FILLET9_R), FILLET9_R, 180, 90)
            Line((0, FILLET9_R), (0, 0))
            Line((0, 0), (FILLET9_R, 0))
        make_face()
    extrude(amount=20.5, mode=Mode.SUBTRACT)
    with BuildSketch(Plane(origin=(-51.976721396074225, -49.70000000000001, -101), x_dir=(0, 1, 0), z_dir=(1, 0, 0))) as fillet9_piece_30:
        with BuildLine():
            CenterArc((FILLET9_R, -FILLET9_R), FILLET9_R, 90, 90)
            Line((0, -FILLET9_R), (0, 0))
            Line((0, 0), (FILLET9_R, 0))
        make_face()
    extrude(amount=100.00000000000001, mode=Mode.SUBTRACT)
    with BuildSketch(Plane(origin=(45.523278603925775, -52.20000000000001, -101), x_dir=(0, 0, -1), z_dir=(0, 1, 0))) as fillet9_piece_31:
        with BuildLine():
            CenterArc((FILLET9_R, FILLET9_R), FILLET9_R, 180, 90)
            Line((0, FILLET9_R), (0, 0))
            Line((0, 0), (FILLET9_R, 0))
        make_face()
    extrude(amount=22.50000000000001, mode=Mode.SUBTRACT)
    with BuildSketch(Plane(origin=(41.52327860392579, -45.7, -101), x_dir=(1.6e-16, -1, 0), z_dir=(-1, -1.6e-16, 0))) as fillet9_piece_32:
        with BuildLine():
            CenterArc((FILLET9_R, -FILLET9_R), FILLET9_R, 90, 90)
            Line((0, -FILLET9_R), (0, 0))
            Line((0, 0), (FILLET9_R, 0))
        make_face()
    extrude(amount=87, mode=Mode.SUBTRACT)
    with BuildSketch(Plane(origin=(-45.47672139607422, -45.70000000000002, -101), x_dir=(-1, -4.7e-16, 0), z_dir=(-4.7e-16, 1, 0))) as fillet9_piece_33:
        with BuildLine():
            CenterArc((FILLET9_R, -FILLET9_R), FILLET9_R, 90, 90)
            Line((0, -FILLET9_R), (0, 0))
            Line((0, 0), (FILLET9_R, 0))
        make_face()
    extrude(amount=17.500000000000007, mode=Mode.SUBTRACT)
    with BuildSketch(Plane(origin=(41.52327860392578, -29.700000000000003, -101), x_dir=(0, 0, -1), z_dir=(2.3e-16, -1, 0))) as fillet9_piece_34a_section:
        with BuildLine():
            CenterArc((FILLET9_R, FILLET9_R), FILLET9_R, 180, 90)
            Line((0, FILLET9_R), (0, 0))
            Line((0, 0), (FILLET9_R, 0))
        make_face()
    fillet9_piece_34a = extrude(amount=18.5, mode=Mode.PRIVATE)
    fillet9_piece_34a = split(fillet9_piece_34a, bisect_by=Plane(origin=(41.52327860392578, -45.7, -101), z_dir=(1.6e-16, -1, 0)), keep=Keep.TOP, mode=Mode.PRIVATE)
    with BuildSketch(Plane(origin=(44.02327860392579, -45.7, -101), x_dir=(1.6e-16, -1, 0), z_dir=(-1, -1.6e-16, 0))) as fillet9_piece_34b_section:
        with BuildLine():
            CenterArc((FILLET9_R, -FILLET9_R), FILLET9_R, 90, 90)
            Line((0, -FILLET9_R), (0, 0))
            Line((0, 0), (FILLET9_R, 0))
        make_face()
    fillet9_piece_34b = extrude(amount=89.5, mode=Mode.PRIVATE)
    fillet9_piece_34b = split(fillet9_piece_34b, bisect_by=Plane(origin=(41.52327860392579, -45.7, -101), z_dir=(1, 2.3e-16, 0)), keep=Keep.TOP, mode=Mode.PRIVATE)
    fillet9_piece_34 = fillet9_piece_34a & fillet9_piece_34b
    add(fillet9_piece_34, mode=Mode.SUBTRACT)
    with BuildSketch(Plane(origin=(41.52327860392579, -45.7, -101), x_dir=(1.6e-16, -1, 0), z_dir=(-1, -1.6e-16, 0))) as fillet9_piece_35a_section:
        with BuildLine():
            CenterArc((FILLET9_R, -FILLET9_R), FILLET9_R, 90, 90)
            Line((0, -FILLET9_R), (0, 0))
            Line((0, 0), (FILLET9_R, 0))
        make_face()
    fillet9_piece_35a = extrude(amount=89.5, mode=Mode.PRIVATE)
    fillet9_piece_35a = split(fillet9_piece_35a, bisect_by=Plane(origin=(-45.47672139607421, -45.700000000000045, -101), z_dir=(-1, -4.7e-16, 0)), keep=Keep.TOP, mode=Mode.PRIVATE)
    with BuildSketch(Plane(origin=(-45.47672139607422, -48.20000000000002, -101), x_dir=(-1, -4.7e-16, 0), z_dir=(-4.7e-16, 1, 0))) as fillet9_piece_35b_section:
        with BuildLine():
            CenterArc((FILLET9_R, -FILLET9_R), FILLET9_R, 90, 90)
            Line((0, -FILLET9_R), (0, 0))
            Line((0, 0), (FILLET9_R, 0))
        make_face()
    fillet9_piece_35b = extrude(amount=17.500000000000007, mode=Mode.PRIVATE)
    fillet9_piece_35b = split(fillet9_piece_35b, bisect_by=Plane(origin=(-45.47672139607422, -45.70000000000002, -101), z_dir=(1.6e-16, -1, 0)), keep=Keep.TOP, mode=Mode.PRIVATE)
    fillet9_piece_35 = fillet9_piece_35a & fillet9_piece_35b
    add(fillet9_piece_35, mode=Mode.SUBTRACT)


solid = part.part
